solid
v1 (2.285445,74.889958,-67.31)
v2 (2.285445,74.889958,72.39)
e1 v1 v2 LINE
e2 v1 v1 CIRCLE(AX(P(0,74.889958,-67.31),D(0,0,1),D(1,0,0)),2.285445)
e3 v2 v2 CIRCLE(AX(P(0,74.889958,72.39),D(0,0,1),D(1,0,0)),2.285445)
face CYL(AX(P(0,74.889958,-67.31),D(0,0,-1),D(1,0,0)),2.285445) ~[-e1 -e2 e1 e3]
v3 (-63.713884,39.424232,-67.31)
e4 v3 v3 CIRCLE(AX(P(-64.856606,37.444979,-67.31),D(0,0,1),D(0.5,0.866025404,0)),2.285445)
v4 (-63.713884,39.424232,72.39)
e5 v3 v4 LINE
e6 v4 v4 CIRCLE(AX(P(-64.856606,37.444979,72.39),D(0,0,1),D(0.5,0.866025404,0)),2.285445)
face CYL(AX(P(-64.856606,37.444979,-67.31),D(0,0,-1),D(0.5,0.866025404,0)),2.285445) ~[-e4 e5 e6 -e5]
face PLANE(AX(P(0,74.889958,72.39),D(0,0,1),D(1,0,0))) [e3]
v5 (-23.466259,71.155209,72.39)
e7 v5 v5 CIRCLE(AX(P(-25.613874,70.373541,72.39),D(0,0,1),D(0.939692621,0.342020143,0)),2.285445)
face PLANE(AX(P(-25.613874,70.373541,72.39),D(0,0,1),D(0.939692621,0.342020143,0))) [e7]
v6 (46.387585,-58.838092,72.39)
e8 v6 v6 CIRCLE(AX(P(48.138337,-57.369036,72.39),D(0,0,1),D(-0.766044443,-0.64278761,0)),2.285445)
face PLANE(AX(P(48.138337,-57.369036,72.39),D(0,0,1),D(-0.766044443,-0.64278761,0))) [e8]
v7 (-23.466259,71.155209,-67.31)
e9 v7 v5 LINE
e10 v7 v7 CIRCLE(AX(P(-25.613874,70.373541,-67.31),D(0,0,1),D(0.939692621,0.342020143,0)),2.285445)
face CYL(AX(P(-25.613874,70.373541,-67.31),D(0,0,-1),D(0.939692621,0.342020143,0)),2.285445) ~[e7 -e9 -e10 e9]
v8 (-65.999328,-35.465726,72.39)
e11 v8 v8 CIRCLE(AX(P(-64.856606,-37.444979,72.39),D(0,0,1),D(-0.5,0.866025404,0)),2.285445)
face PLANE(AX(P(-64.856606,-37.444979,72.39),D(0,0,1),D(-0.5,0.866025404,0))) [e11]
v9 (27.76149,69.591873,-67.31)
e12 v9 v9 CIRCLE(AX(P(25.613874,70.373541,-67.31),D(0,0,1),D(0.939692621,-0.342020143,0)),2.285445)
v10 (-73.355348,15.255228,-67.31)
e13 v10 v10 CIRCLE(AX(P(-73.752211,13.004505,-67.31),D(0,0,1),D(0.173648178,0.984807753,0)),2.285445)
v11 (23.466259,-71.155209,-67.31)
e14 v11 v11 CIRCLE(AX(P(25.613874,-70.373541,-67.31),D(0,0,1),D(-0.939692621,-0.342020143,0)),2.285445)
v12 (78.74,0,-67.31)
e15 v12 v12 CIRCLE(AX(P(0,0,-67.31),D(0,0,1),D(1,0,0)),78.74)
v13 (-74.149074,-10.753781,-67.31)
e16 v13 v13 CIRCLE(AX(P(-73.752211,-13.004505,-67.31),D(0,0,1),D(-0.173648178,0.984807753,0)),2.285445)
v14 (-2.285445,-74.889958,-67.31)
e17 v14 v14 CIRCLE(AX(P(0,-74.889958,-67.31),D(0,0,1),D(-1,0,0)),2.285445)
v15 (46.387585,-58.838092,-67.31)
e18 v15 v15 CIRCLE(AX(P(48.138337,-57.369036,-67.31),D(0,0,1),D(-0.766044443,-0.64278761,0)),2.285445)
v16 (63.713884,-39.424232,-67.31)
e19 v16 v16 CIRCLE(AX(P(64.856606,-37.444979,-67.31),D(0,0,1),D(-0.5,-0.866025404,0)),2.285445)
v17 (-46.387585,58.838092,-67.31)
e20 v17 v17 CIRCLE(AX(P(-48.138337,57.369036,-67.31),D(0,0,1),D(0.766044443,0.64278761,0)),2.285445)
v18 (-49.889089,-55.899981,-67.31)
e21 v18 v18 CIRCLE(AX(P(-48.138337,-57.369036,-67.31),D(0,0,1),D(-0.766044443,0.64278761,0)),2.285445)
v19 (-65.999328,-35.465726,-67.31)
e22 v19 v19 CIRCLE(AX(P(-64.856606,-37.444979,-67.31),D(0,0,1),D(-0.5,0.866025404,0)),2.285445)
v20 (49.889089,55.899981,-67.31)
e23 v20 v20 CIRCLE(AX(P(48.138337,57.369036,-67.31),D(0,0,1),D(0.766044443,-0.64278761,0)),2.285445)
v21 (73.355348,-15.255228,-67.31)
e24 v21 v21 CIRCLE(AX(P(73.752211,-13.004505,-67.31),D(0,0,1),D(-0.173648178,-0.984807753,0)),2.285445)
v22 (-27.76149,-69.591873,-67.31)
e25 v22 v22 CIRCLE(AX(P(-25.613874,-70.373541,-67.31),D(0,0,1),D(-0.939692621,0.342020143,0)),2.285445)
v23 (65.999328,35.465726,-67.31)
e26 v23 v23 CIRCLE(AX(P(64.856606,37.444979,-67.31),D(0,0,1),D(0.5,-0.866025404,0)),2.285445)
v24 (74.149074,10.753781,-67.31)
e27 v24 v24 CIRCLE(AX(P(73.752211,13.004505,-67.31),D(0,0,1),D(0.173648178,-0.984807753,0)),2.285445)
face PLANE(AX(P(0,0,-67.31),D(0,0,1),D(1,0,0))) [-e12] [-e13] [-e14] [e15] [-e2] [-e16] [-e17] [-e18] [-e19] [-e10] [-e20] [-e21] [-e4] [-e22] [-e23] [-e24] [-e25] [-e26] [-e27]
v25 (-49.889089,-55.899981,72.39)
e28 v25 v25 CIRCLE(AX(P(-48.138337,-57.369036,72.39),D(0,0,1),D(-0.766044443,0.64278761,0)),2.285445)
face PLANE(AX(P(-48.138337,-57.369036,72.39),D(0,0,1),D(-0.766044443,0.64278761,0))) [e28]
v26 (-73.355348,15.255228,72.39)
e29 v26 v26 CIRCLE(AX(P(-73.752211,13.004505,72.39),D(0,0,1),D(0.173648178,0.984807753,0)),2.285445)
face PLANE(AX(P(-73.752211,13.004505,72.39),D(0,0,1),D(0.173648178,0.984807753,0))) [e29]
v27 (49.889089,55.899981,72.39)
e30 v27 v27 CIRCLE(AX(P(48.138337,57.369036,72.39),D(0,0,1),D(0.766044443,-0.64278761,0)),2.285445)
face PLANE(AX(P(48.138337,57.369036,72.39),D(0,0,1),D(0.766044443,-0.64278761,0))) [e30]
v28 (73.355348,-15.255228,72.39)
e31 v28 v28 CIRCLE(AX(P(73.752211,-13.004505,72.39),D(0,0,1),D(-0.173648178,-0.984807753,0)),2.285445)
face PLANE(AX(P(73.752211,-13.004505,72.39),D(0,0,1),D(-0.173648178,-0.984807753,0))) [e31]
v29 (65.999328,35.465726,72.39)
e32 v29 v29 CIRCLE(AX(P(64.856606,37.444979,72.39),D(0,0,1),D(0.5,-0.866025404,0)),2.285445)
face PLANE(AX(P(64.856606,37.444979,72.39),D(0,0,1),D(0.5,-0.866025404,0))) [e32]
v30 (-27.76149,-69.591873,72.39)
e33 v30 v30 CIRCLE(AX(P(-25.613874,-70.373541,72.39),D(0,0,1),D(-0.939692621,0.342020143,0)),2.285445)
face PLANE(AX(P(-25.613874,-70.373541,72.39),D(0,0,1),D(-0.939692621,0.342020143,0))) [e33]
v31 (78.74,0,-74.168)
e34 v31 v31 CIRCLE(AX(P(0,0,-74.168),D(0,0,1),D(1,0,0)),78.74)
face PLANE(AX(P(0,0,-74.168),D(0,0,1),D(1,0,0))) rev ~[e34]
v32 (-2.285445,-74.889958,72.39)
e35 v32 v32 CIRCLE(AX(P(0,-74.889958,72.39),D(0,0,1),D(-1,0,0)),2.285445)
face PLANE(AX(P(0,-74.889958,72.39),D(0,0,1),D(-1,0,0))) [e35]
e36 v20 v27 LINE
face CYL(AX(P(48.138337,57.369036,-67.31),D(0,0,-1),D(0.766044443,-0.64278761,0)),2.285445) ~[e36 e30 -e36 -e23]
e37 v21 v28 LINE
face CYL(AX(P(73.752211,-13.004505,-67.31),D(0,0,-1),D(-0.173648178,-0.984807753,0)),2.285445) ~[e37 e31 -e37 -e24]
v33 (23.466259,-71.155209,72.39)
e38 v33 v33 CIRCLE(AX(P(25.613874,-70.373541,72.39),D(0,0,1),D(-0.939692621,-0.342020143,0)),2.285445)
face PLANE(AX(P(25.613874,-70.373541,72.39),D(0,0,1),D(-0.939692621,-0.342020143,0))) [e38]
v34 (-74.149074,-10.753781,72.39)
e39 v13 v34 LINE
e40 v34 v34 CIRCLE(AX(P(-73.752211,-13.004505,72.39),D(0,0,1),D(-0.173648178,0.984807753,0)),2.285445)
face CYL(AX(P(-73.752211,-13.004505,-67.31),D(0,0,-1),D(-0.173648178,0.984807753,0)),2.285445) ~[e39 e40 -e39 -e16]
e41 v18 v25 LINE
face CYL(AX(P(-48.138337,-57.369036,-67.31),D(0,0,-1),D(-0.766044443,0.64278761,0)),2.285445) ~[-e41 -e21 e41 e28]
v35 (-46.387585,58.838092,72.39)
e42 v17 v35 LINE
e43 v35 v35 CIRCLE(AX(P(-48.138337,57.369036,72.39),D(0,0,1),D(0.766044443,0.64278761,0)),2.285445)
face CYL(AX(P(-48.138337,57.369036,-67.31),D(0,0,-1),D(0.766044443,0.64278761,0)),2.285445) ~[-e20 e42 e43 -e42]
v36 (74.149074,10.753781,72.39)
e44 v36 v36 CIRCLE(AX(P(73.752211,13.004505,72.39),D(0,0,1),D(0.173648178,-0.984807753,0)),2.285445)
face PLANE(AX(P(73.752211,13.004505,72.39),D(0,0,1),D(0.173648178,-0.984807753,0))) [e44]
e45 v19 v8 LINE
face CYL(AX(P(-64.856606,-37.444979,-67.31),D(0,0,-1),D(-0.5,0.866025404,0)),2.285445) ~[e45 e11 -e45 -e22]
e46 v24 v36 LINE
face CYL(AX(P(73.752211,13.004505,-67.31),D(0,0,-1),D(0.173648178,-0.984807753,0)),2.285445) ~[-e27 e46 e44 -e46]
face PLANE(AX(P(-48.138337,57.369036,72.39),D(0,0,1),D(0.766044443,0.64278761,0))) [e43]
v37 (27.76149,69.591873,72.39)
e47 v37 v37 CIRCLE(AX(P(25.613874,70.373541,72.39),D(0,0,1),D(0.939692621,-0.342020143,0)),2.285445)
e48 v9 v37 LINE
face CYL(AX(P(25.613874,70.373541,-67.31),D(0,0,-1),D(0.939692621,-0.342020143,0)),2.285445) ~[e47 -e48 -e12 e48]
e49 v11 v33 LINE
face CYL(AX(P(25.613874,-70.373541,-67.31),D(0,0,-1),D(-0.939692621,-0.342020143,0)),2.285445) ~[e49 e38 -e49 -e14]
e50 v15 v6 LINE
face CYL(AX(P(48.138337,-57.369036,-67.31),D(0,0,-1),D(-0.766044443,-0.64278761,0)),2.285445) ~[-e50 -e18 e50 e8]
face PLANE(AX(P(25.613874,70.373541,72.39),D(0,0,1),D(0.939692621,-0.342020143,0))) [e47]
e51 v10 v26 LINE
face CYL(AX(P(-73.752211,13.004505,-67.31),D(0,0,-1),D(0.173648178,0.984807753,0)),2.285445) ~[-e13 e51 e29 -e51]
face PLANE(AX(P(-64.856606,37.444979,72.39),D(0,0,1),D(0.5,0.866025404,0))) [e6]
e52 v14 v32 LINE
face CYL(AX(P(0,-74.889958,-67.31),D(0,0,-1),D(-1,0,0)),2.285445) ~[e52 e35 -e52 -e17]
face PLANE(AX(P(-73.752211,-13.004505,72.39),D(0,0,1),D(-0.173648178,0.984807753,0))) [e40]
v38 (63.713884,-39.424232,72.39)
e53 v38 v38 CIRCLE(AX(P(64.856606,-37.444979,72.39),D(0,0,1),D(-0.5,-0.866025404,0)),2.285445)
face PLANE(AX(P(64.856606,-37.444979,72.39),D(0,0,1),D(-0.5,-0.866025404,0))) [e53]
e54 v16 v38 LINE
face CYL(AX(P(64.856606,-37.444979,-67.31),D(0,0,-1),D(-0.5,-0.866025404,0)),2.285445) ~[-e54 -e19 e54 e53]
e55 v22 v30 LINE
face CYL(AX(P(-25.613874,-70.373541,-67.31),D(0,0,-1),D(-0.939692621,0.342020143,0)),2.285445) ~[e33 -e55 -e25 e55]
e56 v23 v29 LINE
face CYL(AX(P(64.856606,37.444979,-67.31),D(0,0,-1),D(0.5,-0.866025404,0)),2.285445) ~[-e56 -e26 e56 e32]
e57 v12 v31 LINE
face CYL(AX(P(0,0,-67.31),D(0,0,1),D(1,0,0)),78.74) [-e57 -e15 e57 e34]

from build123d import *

# Parameters (mm, degrees)
F1_START        = -67.31
F0_R            = 78.74
F1_DEPTH        = 6.858
F2_R            = 2.285444595
F3_DEPTH        = 139.7
F3_COPIES_COUNT = 18


# Not quite as in the source:
# - a pattern or mirror of a feature is missing from the dataset's text; its kind, count and spacing are read off the source's solid


with BuildPart() as f1:
    # F0 (on Top) → F1 (new body)
    with BuildSketch(Plane.XY.offset(F1_START)):
        Circle(F0_R)
    extrude(amount=-F1_DEPTH)

    # F2 (on face) → F3 (join)
    with BuildSketch(Plane.XY.offset(-67.31)):
        with Locations((0, 74.8899579048)):
            Circle(F2_R)
    f3 = extrude(amount=F3_DEPTH)

    # F3_copies: F3 ×18 about axis
    f3_copies_axis = Axis((0, 0, 0), (0, 0, 1))
    for i in range(1, F3_COPIES_COUNT):
        add(f3.rotate(f3_copies_axis, i * 360 / F3_COPIES_COUNT))


solid = f1.part
